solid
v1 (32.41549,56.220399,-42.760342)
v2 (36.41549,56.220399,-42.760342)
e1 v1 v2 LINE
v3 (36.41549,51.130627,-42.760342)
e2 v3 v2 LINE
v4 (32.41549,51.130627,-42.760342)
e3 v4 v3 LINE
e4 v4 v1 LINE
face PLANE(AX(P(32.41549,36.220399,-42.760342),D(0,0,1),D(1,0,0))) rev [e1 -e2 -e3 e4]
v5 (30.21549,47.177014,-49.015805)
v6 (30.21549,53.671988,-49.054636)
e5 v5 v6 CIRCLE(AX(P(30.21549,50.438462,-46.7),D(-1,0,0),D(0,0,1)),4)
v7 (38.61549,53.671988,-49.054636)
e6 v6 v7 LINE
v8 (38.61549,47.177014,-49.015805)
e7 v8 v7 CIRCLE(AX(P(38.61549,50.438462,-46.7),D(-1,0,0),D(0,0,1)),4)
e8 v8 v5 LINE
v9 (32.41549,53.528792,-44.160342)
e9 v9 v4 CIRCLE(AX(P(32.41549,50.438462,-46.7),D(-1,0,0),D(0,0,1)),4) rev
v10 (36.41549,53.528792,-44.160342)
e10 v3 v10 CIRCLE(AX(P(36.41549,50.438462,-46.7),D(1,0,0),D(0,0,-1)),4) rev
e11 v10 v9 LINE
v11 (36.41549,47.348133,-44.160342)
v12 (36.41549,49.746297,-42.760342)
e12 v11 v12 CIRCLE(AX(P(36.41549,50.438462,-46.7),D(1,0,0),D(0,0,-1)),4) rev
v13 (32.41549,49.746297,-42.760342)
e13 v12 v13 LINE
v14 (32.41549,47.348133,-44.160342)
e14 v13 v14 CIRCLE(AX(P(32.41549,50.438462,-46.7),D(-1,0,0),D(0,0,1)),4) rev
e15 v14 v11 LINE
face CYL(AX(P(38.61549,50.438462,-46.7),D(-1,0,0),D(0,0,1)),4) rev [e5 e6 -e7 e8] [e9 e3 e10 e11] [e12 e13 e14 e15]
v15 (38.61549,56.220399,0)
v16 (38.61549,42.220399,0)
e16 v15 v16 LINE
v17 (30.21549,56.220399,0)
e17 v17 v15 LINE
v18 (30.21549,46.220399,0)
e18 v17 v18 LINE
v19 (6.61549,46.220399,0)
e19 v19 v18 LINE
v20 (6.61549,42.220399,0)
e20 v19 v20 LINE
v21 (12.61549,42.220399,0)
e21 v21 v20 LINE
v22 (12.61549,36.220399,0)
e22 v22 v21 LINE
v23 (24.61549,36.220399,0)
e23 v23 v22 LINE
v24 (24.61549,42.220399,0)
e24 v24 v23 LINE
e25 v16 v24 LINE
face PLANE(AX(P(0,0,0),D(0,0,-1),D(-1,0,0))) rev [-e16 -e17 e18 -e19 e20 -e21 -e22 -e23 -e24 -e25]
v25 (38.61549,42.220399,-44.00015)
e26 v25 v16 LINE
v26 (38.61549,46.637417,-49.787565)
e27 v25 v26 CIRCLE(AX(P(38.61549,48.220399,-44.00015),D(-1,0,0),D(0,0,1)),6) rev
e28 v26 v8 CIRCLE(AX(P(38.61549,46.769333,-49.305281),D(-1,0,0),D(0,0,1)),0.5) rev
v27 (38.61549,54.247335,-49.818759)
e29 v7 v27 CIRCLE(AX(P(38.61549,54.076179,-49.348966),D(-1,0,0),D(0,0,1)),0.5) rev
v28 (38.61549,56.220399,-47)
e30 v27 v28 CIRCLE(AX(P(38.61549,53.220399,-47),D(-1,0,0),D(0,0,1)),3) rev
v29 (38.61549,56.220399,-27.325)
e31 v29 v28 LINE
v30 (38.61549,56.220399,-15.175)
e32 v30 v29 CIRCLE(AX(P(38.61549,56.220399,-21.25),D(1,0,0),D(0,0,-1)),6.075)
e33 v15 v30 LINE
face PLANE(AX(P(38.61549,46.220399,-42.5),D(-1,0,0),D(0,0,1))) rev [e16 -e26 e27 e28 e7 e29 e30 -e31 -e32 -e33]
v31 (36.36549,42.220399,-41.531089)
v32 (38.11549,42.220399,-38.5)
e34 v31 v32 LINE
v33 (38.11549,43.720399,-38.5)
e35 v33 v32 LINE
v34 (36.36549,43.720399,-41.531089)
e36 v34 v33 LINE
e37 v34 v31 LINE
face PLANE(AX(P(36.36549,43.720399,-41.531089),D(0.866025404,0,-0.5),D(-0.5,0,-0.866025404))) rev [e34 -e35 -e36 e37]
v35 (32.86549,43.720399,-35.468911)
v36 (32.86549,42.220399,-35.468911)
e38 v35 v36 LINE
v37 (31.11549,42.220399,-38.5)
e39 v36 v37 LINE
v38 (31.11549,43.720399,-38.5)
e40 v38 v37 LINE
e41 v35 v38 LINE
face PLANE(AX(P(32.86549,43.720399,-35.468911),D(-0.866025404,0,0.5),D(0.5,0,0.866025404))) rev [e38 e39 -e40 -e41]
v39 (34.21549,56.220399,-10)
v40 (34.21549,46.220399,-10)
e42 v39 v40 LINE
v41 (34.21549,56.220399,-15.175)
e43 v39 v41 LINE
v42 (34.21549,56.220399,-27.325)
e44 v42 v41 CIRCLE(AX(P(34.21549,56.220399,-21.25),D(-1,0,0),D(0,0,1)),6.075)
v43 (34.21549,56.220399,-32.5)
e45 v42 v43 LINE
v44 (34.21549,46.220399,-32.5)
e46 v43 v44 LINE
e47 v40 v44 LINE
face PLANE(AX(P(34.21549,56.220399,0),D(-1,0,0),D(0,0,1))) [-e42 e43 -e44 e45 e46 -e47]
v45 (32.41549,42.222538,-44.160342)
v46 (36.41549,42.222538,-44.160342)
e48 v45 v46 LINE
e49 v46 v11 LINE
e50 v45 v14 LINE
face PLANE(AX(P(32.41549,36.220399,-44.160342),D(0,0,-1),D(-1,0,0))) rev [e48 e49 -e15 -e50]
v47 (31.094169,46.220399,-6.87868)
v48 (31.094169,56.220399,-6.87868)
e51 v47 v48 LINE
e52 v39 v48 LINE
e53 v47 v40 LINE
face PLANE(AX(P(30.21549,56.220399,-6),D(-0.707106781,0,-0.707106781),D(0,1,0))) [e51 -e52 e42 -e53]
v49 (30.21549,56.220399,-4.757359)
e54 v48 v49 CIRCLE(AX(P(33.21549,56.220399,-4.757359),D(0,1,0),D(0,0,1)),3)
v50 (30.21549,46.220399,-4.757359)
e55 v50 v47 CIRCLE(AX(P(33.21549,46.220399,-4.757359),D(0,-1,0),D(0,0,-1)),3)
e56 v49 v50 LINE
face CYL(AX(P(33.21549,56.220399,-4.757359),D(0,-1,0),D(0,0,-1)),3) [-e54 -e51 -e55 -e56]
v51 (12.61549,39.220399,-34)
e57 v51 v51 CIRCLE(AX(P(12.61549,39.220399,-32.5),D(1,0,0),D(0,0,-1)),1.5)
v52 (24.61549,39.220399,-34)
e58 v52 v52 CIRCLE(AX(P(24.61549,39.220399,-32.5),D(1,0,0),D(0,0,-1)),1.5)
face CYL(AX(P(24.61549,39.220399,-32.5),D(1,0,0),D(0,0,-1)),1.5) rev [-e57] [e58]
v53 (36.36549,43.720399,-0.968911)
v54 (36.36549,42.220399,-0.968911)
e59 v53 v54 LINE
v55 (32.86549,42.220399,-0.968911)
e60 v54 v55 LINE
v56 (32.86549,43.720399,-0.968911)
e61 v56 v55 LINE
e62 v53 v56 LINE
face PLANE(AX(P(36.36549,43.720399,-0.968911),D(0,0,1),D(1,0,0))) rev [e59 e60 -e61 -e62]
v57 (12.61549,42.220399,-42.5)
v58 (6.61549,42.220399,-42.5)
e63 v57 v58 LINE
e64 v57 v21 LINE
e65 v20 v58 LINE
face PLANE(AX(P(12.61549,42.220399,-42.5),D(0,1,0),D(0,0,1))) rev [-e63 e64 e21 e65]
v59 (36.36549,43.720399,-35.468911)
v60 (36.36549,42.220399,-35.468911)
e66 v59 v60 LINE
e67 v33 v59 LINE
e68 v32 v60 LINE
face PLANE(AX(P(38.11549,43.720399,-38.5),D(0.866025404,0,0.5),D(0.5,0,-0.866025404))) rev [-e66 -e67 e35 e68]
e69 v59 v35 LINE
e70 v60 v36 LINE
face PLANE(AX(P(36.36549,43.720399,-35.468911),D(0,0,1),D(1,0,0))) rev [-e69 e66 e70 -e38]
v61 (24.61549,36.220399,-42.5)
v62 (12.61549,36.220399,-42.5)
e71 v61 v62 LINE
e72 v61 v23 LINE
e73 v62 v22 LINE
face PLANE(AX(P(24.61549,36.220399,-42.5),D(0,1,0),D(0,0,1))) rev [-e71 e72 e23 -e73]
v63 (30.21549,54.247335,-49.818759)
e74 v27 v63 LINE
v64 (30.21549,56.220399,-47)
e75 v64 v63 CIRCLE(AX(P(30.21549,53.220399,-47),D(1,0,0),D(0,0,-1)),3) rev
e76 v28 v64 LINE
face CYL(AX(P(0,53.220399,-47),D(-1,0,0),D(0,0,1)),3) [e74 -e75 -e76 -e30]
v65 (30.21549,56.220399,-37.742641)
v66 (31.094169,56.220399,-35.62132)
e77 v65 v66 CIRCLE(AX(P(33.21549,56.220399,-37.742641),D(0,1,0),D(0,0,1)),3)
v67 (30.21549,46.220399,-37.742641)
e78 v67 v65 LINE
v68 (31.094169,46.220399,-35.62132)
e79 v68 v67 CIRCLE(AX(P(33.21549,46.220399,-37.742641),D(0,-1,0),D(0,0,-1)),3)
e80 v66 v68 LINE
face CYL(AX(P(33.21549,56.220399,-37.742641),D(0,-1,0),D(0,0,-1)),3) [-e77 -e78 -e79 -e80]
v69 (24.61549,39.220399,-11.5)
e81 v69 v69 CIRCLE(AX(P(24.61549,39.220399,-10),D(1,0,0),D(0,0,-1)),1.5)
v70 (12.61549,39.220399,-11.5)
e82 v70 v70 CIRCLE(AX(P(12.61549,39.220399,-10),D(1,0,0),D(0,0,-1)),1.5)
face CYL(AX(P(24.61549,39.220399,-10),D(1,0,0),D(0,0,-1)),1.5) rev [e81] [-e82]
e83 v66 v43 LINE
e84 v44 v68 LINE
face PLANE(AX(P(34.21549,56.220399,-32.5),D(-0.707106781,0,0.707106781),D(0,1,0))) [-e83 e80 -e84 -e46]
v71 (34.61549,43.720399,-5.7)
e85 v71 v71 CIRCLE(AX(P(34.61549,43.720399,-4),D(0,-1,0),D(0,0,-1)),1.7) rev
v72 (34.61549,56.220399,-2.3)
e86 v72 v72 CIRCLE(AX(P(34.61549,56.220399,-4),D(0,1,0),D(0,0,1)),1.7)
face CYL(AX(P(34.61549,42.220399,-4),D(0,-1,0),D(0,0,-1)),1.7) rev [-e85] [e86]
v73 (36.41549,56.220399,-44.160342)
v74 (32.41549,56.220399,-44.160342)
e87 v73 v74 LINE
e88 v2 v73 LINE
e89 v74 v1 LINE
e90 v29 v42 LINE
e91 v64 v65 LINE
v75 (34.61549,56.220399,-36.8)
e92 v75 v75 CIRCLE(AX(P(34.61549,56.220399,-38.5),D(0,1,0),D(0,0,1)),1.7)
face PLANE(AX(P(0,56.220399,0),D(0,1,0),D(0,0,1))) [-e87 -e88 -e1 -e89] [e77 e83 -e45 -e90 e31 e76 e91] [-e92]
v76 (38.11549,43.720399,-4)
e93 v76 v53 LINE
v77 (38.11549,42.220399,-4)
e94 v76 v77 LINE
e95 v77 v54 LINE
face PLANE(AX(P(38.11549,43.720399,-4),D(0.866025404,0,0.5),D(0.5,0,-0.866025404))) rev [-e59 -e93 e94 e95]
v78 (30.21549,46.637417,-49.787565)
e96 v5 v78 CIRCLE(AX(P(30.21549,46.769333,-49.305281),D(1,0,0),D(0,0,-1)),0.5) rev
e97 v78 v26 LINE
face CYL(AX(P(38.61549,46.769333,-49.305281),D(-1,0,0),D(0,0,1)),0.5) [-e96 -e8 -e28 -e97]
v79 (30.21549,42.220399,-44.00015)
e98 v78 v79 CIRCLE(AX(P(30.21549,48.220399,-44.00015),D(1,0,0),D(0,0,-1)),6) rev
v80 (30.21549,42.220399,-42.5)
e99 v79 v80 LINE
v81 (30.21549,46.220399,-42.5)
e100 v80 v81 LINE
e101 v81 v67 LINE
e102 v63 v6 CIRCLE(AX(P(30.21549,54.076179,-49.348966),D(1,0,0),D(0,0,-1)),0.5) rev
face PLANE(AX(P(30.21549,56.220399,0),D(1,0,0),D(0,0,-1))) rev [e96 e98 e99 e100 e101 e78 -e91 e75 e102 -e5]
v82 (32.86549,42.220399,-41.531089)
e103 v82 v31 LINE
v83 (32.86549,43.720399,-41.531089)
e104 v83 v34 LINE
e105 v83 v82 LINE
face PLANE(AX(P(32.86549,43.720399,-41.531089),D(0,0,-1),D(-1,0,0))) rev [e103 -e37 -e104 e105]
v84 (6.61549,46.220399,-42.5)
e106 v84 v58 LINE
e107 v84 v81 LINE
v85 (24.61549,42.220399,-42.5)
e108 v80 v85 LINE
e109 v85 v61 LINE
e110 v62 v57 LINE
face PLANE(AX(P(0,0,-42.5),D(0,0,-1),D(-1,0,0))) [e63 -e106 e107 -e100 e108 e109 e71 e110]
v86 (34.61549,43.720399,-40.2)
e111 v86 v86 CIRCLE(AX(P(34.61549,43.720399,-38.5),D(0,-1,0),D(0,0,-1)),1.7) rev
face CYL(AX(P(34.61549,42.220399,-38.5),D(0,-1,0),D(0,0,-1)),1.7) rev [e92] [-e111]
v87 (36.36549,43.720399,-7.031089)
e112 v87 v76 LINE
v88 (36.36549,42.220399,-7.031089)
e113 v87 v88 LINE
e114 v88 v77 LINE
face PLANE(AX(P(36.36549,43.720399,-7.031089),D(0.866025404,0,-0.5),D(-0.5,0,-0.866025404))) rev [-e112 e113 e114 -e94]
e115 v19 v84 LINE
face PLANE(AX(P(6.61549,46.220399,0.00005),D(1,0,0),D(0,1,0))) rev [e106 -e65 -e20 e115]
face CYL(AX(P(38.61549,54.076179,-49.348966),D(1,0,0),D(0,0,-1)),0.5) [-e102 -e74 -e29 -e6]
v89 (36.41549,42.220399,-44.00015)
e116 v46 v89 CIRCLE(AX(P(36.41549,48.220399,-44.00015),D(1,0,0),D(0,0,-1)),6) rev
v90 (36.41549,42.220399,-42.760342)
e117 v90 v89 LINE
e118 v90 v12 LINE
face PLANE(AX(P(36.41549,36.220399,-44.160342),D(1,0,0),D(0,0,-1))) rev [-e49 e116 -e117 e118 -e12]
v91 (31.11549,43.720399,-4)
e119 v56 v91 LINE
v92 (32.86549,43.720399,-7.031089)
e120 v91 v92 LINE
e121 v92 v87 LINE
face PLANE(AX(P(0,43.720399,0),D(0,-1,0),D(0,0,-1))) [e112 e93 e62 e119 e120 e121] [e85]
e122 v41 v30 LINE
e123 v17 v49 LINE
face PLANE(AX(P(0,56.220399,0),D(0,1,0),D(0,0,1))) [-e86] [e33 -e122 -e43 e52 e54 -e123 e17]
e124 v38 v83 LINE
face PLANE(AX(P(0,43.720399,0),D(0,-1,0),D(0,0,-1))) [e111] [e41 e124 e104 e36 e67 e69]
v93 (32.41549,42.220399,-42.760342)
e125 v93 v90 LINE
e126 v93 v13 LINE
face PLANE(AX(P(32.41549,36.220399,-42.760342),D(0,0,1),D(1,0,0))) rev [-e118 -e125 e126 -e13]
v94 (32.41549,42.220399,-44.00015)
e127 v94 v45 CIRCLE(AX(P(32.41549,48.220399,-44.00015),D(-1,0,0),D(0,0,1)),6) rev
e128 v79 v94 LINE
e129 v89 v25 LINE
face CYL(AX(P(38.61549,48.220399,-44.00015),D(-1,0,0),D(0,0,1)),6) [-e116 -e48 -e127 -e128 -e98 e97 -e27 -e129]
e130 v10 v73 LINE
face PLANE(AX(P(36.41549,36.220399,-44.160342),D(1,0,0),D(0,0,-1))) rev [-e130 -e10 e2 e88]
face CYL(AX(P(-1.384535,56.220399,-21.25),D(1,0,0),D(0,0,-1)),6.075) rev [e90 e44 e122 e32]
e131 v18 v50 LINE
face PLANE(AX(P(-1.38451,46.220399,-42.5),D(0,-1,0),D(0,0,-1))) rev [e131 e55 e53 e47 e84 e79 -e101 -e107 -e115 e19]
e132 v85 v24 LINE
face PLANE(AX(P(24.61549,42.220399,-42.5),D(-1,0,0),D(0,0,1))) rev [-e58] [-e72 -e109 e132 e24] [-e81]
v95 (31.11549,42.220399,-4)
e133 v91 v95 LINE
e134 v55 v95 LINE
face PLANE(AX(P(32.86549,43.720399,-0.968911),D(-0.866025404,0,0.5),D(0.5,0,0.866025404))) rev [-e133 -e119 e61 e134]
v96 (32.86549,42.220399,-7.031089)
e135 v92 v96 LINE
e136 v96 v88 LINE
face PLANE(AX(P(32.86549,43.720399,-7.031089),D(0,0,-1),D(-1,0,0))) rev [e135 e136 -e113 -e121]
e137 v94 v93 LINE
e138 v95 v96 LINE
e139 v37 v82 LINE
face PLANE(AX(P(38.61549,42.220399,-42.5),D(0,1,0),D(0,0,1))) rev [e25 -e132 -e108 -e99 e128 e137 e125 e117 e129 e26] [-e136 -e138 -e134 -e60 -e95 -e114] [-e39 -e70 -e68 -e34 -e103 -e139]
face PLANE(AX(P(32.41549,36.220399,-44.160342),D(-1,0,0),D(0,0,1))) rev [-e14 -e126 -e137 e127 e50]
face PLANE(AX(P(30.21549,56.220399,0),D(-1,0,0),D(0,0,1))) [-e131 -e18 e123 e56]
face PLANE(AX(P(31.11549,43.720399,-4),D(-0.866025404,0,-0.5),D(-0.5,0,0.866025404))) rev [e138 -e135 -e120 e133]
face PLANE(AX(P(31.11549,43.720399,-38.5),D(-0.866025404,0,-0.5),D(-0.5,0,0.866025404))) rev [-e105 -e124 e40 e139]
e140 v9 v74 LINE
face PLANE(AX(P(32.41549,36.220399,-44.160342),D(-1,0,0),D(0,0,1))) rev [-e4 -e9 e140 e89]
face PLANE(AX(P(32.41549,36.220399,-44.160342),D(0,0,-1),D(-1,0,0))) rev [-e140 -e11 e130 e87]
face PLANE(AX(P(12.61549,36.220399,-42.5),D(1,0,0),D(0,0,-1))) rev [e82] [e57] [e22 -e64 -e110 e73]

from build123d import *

# Parameters (mm, degrees)
BOSS_EXTRU_1_DEPTH      = 42.5
D_GAGEMENT_M31_D        = 3
ESQUISSE10_W            = 4
ESQUISSE10_H            = 10
BOSS_EXTRU_2_DEPTH      = 10
ESQUISSE12_R            = 6.075
ENL_V_MAT_EXTRU_3_DEPTH = 82.036925103
D_GAGEMENT_M33_D        = 3.4
ENL_V_MAT_EXTRU_1_DEPTH = 1.5
CHANFREIN1_SIZE         = 4
ESQUISSE13_W            = 8
ESQUISSE13_H            = 4
ENL_V_MAT_EXTRU_4_DEPTH = 81.362549025
ESQUISSE14_W            = 8.4
ESQUISSE14_H            = 14
BOSS_EXTRU_3_DEPTH      = 7.5
ESQUISSE15_R            = 4
ENL_V_MAT_EXTRU_5_DEPTH = 79.852350822
CONG_2_R                = 3
CONG_3_R                = 6
CONG_4_R                = 0.5
ESQUISSE16_W            = 4
ESQUISSE16_H            = 1.4
ENL_V_MAT_EXTRU_6_DEPTH = 67.151912076
CONG_5_R                = 3


# Some blends are built 0.0001 mm under size
with BuildPart() as part:
    # Esquisse1 → Boss.-Extru.1 (new body)
    with BuildSketch(Plane(origin=(0, 0, 0), x_dir=(1, 0, 0), z_dir=(0, 0, -1))):
        Polygon((-1.384510159, -46.220398701), (38.615489841, -46.220398701), (38.615489841, -42.220398701), (24.615489841, -42.220398701), (24.615489841, -36.220398701), (12.615489841, -36.220398701), (12.615489841, -42.220398701), (-1.384510159, -42.220398701), align=None)
    extrude(amount=BOSS_EXTRU_1_DEPTH)

    # Dégagement M31 (through all)
    with Locations(Plane(origin=(24.615489841, 0, 0), x_dir=(0, 0, -1), z_dir=(1, 0, 0))):
        with Locations((10, 39.220398701), (32.5, 39.220398701)):
            Hole(D_GAGEMENT_M31_D / 2)

    # Esquisse10 → Boss.-Extru.2 (add)
    with BuildSketch(Plane(origin=(0, 46.220398701, 0), x_dir=(1, 0, 0), z_dir=(0, 1, 0))):
        with Locations((32.215489841, 37.5)):
            Rectangle(ESQUISSE10_W, ESQUISSE10_H)
        Polygon((34.215489841, 10), (34.215489841, 0), (38.615489841, 0), (38.615489841, 42.5), (34.215489841, 42.5), (34.215489841, 32.5), align=None)
        with Locations((32.215489841, 5)):
            Rectangle(ESQUISSE10_W, ESQUISSE10_H)
    extrude(amount=BOSS_EXTRU_2_DEPTH)

    # Esquisse12 → Enlèv. mat.-Extru.3 (cut, through all)
    with BuildSketch(Plane(origin=(38.615489841, 0, 0), x_dir=(0, 0, -1), z_dir=(1, 0, 0))):
        with Locations((21.25, 56.220398701)):
            Circle(ESQUISSE12_R)
    extrude(amount=-ENL_V_MAT_EXTRU_3_DEPTH, mode=Mode.SUBTRACT)

    # Dégagement M33 (through all)
    with Locations(Plane(origin=(0, 42.220398701, 0), x_dir=(-1, 0, 0), z_dir=(0, -1, 0))):
        with Locations((3, -59.94627318), (-34.615489841, 38.5), (-2.615489841, 38.5), (-2.615489841, 4), (-34.615489841, 4)):
            Hole(D_GAGEMENT_M33_D / 2)

    # Esquisse9 → Enlèv. mat.-Extru.1 (cut)
    with BuildSketch(Plane.XZ.offset(-42.220398701)):
        Polygon((32.865489841, -35.468911087), (31.115489841, -38.5), (32.865489841, -41.531088913), (36.365489841, -41.531088913), (38.115489841, -38.5), (36.365489841, -35.468911087), align=None)
        Polygon((4.365489841, -35.468911087), (0.865489841, -35.468911087), (-0.884510159, -38.5), (0.865489841, -41.531088913), (4.365489841, -41.531088913), (6.115489841, -38.5), align=None)
        Polygon((32.865489841, -0.968911087), (31.115489841, -4), (32.865489841, -7.031088913), (36.365489841, -7.031088913), (38.115489841, -4), (36.365489841, -0.968911087), align=None)
        Polygon((4.365489841, -0.968911087), (0.865489841, -0.968911087), (-0.884510159, -4), (0.865489841, -7.031088913), (4.365489841, -7.031088913), (6.115489841, -4), align=None)
    extrude(amount=-ENL_V_MAT_EXTRU_1_DEPTH, mode=Mode.SUBTRACT)

    # Chanfrein1
    chanfrein1_edges = [part.edges().sort_by_distance(p)[0] for p in [
        (30.215489841, 51.220398701, -32.5),
        (30.215489841, 51.220398701, -10),
    ]]
    chamfer(chanfrein1_edges, length=CHANFREIN1_SIZE - 0.0001)  # a hair under: the kernel refuses the full size

    # Esquisse13 → Enlèv. mat.-Extru.4 (cut, through all)
    with BuildSketch(Plane(origin=(0, 0, -42.5), x_dir=(-1, 0, 0), z_dir=(0, 0, -1))):
        with Locations((-2.615489841, 44.220398701)):
            Rectangle(ESQUISSE13_W, ESQUISSE13_H)
    extrude(amount=-ENL_V_MAT_EXTRU_4_DEPTH, mode=Mode.SUBTRACT)

    # Esquisse14 → Boss.-Extru.3 (add)
    with BuildSketch(Plane(origin=(0, 0, -42.5), x_dir=(-1, 0, 0), z_dir=(0, 0, -1))):
        with Locations((-34.415489841, 49.220398701)):
            Rectangle(ESQUISSE14_W, ESQUISSE14_H)
    extrude(amount=BOSS_EXTRU_3_DEPTH)

    # Esquisse15 → Enlèv. mat.-Extru.5 (cut, through all)
    with BuildSketch(Plane.ZY.offset(-30.215489841)):
        with Locations((-46.7, 50.438462286)):
            Circle(ESQUISSE15_R)
    extrude(amount=-ENL_V_MAT_EXTRU_5_DEPTH, mode=Mode.SUBTRACT)

    # Congé2
    cong_2_edges = [part.edges().sort_by_distance(p)[0] for p in [
        (34.415489841, 56.220398701, -50),
    ]]
    fillet(cong_2_edges, radius=CONG_2_R)

    # Congé3
    # the kernel refuses this fillet: 6 mm, written as the material it takes off along each edge
    with BuildSketch(Plane(origin=(53.615489841, 42.220398701, -50), x_dir=(0, 1, 0), z_dir=(-1, 0, 0))) as cong_3_piece_1:
        with BuildLine():
            CenterArc((CONG_3_R, -CONG_3_R), CONG_3_R, 90, 90)
            Line((0, -CONG_3_R), (0, 0))
            Line((0, 0), (CONG_3_R, 0))
        make_face()
    extrude(amount=38.4, mode=Mode.SUBTRACT)

    # Congé4
    cong_4_edges = [part.edges().sort_by_distance(p)[0] for p in [
        (34.415489841, 52.698993197, -50),
        (34.415489841, 48.177709694, -49.999848135),
    ]]
    fillet(cong_4_edges, radius=CONG_4_R)

    # Esquisse16 → Enlèv. mat.-Extru.6 (cut, through all)
    with BuildSketch(Plane(origin=(0, 56.220398701, 0), x_dir=(1, 0, 0), z_dir=(0, 1, 0))):
        with Locations((34.415489841, 43.46034171)):
            Rectangle(ESQUISSE16_W, ESQUISSE16_H)
    extrude(amount=-ENL_V_MAT_EXTRU_6_DEPTH, mode=Mode.SUBTRACT)

    # Congé5
    cong_5_edges = [part.edges().sort_by_distance(p)[0] for p in [
        (30.215489841, 51.220398701, -36.4999),
        (30.215489841, 51.220398701, -6.0001),
    ]]
    fillet(cong_5_edges, radius=CONG_5_R)


solid = part.part
